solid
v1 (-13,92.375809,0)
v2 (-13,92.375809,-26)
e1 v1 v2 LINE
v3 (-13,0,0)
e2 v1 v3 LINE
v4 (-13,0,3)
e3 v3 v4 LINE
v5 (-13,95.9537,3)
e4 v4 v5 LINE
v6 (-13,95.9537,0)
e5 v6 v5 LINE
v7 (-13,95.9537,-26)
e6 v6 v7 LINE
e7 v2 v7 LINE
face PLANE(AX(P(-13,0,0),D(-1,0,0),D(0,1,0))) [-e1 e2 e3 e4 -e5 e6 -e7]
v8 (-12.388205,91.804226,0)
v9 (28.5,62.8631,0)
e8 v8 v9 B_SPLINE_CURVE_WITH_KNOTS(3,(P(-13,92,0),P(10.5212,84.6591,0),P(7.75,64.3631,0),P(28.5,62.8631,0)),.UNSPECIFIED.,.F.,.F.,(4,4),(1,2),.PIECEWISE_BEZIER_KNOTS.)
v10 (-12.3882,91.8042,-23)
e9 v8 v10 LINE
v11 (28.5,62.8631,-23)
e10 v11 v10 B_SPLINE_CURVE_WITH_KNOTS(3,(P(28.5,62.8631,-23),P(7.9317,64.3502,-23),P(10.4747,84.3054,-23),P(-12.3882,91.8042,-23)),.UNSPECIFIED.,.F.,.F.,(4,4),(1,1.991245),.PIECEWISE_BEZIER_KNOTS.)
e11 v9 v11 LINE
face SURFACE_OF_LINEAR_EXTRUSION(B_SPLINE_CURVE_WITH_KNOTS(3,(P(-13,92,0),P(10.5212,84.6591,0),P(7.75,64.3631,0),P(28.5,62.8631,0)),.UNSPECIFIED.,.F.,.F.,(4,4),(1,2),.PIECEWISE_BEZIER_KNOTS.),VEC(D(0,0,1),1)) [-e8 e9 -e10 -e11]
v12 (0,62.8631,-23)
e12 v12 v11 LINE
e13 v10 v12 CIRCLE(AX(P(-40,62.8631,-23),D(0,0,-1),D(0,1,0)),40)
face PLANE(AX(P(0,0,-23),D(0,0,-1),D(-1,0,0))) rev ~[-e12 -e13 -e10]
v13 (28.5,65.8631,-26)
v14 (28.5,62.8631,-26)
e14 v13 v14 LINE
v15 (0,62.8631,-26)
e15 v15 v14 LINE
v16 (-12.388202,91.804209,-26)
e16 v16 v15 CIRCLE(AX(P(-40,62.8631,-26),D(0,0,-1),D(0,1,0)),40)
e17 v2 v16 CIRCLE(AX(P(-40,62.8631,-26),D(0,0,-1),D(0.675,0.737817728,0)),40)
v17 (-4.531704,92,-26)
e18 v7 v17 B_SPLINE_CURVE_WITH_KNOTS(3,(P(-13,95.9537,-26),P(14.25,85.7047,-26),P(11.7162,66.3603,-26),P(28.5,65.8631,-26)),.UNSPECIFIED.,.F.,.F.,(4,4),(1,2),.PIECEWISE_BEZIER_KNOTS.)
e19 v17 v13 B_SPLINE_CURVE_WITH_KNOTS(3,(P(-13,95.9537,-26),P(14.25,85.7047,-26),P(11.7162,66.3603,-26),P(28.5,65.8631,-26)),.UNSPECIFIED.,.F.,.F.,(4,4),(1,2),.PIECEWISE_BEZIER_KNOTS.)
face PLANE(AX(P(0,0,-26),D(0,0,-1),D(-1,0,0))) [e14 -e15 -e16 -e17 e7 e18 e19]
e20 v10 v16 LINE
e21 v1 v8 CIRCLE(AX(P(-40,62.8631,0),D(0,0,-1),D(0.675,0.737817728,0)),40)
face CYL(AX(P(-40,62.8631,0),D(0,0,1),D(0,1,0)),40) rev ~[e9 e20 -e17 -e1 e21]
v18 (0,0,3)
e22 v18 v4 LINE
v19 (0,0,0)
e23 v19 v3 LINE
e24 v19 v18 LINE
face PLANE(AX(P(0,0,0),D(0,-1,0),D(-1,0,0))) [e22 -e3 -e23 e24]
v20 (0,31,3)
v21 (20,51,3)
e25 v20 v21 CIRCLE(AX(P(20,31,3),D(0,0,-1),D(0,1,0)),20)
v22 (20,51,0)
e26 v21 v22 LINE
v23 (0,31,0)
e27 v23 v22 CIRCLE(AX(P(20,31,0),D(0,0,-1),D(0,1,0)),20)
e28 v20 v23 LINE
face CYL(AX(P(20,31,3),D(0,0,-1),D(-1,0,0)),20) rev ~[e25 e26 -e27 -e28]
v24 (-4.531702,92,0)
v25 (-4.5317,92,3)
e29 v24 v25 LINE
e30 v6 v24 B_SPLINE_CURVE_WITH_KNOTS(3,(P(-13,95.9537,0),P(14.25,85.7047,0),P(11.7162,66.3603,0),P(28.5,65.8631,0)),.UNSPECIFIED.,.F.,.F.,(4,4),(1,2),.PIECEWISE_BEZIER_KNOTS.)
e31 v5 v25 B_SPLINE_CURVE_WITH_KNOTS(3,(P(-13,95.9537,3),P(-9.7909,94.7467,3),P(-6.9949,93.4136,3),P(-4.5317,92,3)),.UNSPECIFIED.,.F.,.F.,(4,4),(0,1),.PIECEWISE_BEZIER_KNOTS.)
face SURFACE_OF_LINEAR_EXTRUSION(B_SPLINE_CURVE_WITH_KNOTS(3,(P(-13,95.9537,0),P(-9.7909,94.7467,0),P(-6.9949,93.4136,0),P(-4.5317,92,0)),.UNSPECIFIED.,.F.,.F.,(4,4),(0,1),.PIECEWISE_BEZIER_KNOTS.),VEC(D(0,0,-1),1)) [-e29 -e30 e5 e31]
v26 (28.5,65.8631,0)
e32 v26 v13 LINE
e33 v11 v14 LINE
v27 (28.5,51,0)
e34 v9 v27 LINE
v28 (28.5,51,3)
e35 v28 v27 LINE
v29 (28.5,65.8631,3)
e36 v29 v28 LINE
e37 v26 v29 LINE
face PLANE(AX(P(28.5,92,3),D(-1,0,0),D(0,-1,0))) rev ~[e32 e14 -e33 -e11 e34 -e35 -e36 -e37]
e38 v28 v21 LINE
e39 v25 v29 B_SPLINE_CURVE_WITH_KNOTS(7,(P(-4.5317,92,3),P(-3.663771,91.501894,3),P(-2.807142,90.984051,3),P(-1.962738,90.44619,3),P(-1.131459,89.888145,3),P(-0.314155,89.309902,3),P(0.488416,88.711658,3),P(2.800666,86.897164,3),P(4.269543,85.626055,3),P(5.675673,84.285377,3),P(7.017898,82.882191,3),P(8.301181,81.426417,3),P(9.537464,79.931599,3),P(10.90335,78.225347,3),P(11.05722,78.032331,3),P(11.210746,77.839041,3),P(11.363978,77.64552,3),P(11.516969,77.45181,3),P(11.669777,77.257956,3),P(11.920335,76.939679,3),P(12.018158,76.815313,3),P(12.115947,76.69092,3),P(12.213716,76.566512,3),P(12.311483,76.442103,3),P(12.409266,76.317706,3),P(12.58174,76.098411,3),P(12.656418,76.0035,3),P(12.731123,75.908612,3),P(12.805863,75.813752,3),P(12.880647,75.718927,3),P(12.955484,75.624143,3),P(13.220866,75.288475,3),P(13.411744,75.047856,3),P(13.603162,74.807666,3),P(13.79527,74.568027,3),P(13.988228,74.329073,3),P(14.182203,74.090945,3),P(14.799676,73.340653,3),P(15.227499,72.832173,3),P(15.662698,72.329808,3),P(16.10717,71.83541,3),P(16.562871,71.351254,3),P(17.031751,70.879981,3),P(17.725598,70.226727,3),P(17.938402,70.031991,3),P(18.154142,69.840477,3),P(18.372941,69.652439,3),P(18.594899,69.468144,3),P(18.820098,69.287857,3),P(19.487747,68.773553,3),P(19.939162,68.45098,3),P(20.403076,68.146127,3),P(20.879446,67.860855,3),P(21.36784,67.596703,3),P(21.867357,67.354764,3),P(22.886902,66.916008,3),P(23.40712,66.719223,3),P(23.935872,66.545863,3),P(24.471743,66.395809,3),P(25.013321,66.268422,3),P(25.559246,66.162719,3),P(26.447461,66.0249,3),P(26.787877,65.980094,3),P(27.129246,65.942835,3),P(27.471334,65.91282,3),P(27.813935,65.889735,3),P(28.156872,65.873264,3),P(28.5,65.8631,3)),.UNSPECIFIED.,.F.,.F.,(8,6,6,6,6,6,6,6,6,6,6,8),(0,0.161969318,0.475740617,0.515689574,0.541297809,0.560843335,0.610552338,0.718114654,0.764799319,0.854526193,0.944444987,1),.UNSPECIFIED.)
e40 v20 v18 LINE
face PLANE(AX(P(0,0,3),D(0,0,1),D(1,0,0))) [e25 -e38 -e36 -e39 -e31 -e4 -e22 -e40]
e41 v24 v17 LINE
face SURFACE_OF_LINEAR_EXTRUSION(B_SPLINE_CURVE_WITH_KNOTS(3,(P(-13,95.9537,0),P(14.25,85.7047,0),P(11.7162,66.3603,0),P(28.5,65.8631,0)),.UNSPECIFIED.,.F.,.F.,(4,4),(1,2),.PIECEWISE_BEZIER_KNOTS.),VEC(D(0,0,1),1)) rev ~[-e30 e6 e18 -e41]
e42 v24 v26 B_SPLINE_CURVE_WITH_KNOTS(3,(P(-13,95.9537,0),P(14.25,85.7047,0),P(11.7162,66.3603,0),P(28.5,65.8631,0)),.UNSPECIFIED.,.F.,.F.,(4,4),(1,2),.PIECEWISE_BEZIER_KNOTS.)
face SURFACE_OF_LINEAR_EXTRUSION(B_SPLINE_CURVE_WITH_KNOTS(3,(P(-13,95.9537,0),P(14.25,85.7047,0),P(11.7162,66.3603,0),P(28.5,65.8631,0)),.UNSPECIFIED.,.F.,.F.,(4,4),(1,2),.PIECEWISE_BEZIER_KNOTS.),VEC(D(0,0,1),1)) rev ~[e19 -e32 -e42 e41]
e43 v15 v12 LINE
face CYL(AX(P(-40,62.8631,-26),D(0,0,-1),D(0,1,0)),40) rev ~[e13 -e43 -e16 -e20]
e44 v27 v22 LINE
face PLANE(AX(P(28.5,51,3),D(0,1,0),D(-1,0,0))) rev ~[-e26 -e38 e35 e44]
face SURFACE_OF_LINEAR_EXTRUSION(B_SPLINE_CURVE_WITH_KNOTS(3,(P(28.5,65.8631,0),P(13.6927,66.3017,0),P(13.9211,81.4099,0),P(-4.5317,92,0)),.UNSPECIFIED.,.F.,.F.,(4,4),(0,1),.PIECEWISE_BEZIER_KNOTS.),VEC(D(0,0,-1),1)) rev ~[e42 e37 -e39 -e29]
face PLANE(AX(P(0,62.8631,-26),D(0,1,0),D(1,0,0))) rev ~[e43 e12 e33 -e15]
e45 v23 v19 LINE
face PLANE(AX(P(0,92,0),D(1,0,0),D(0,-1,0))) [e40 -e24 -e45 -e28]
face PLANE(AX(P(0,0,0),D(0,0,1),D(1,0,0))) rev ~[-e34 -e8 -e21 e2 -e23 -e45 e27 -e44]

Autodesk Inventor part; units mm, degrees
ref_plane "YZ Plane" through (0, 0, 0) normal (1, 0, 0) x (0, 1, 0)
ref_plane "XZ Plane" through (0, 0, 0) normal (0, 1, 0) x (-1, 0, 0)
ref_plane "XY Plane" through (0, 0, 0) normal (0, 0, 1) x (1, 0, 0)
sketch "Sketch1" plane through (0, 0, 0) normal (0, 0, 1) x (1, 0, 0)
  line L0 (0, 0) -> (-13, 0)
  line L1 (-13, 0) -> (-13, 92)
  line L2 (-13, 92) -> (0, 92)
  line L3 (0, 92) -> (0, 0)
  dimension "d0" = 13
  dimension "d1" = 92
extrude "Extrusion1" add sketch "Sketch1" along normal blind 3
sketch "Sketch3" plane through (0, 0, 3) normal (0, 0, 1) x (1, 0, 0)
  line L0 (0, 92) -> (-13, 92) projected
  line L1 (0, 92) -> (28.5, 92)
  line L2 (28.5, 92) -> (28.5, 51)
  line L3 (28.5, 51) -> (0, 51)
  line L4 (0, 51) -> (0, 92)
  point P0 (0, 0)
  dimension "d6" = 28.5
  dimension "d7" = 41
extrude "Extrusion3" add sketch "Sketch3" against normal up to surface (3 mm away)
sketch "Sketch4" plane through (0, 0, 0) normal (0, 0, -1) x (-1, 0, 0)
  arc A0 (40, 102.8631) -> (0, 62.8631) centre (40, 62.8631) ccw
  arc A1 (-28.5, 65.8631) -> (-42.9914, -4.1369) centre (-28.5, 29.3631) ccw
  line L0 (13, 92) -> (0, 92)
  line L1 (0, 92) -> (-28.5, 92)
  line L2 (-28.5, 92) -> (-28.5, 51)
  line L3 (-28.5, 92) -> (13, 92) projected
  line L4 (-28.5, 65.8631) -> (-28.5, 62.8631)
  line L5 (-28.5, 51) -> (-28.5, 92) projected
  line L6 (13, 92) -> (13, 89)
  line L7 (13, 92) -> (13, 0) projected
  arc A2 (40, 105.4873) -> (13, 95.9537) centre (40, 62.4873) ccw
  line L8 (13, 92) -> (13, 95.9537)
  line L9 (13, 92) -> (-10.5212, 84.6591) construction
  line L10 (-10.5212, 84.6591) -> (-7.75, 64.3631) construction
  line L11 (-7.75, 64.3631) -> (-28.5, 62.8631) construction
  spline S0 degree 3 poles (13, 92) (-10.5212, 84.6591) (-7.75, 64.3631) (-28.5, 62.8631) knots 1 1 1 1 2 2 2 2
  line L12 (13, 95.9537) -> (-14.25, 85.7047) construction
  line L13 (-14.25, 85.7047) -> (-11.7162, 66.3603) construction
  line L14 (-11.7162, 66.3603) -> (-28.5, 65.8631) construction
  spline S1 degree 3 poles (13, 95.9537) (-14.25, 85.7047) (-11.7162, 66.3603) (-28.5, 65.8631) knots 1 1 1 1 2 2 2 2
  point P0 (0, 0)
  point P1 (12.3882, 91.8042)
  point P2 (13, 92.3758)
  dimension "d10" = 3
  dimension "d11" = 3
extrude "Extrusion4" add sketch "Sketch4" along normal blind 26 contours A0 L0 S1 L8 | A0 S0 L2 S1 L0
sketch "Sketch5" plane through (0, 0, 0) normal (0, 0, -1) x (-1, 0, 0)
  spline S0 degree 3 poles (-28.5, 65.8631) (-13.6927, 66.3017) (-13.9211, 81.4099) (4.5317, 92) knots 0 0 0 0 1 1 1 1 projected
  line L0 (-28.5, 92) -> (4.5317, 92) projected
  line L1 (-28.5, 92) -> (-28.5, 65.8631) projected
  point P0 (0, 0)
extrude "Extrusion5" cut sketch "Sketch5" against normal blind 40
sketch "Sketch6" plane through (0, 0, 0) normal (0, 0, 1) x (1, 0, 0)
  line L0 (-4.5317, 92) -> (-12.5949, 92) projected
  spline S0 degree 3 poles (-13, 95.9537) (-9.7909, 94.7467) (-6.9949, 93.4136) (-4.5317, 92) knots 0 0 0 0 1 1 1 1 projected
  line L1 (-13, 92.3758) -> (-13, 95.9537) projected
  arc A0 (-12.5949, 92) -> (-13, 92.3758) centre (-40, 62.8631) ccw projected
  arc A1 (-12.5949, 92) -> (-13, 92.3758) centre (-40, 62.8631) ccw projected
  line L2 (-13, 92.3758) -> (-13, 92)
  line L3 (-13, 92) -> (-12.5949, 92)
  point P0 (0, 0)
extrude "Extrusion6" add sketch "Sketch6" along normal up to surface (3 mm away)
sketch "Sketch7" plane through (0, 0, -26) normal (0, 0, -1) x (-1, 0, 0)
  spline S0 degree 3 poles (-28.5, 62.8631) (-7.9317, 64.3502) (-10.4747, 84.3054) (12.3882, 91.8042) knots 1 1 1 1 1.991245 1.991245 1.991245 1.991245
  arc A0 (40, 102.8631) -> (0, 62.8631) centre (40, 62.8631) ccw
  line L0 (0, 62.8631) -> (-28.5, 62.8631)
  line L1 (-28.5, 62.8631) -> (-28.5, 65.8631)
  line L2 (-28.5, 51) -> (-28.5, 65.8631) projected
  point P0 (0, 0)
extrude "Extrusion7" add sketch "Sketch7" against normal blind 3
fillet "Fillet1" radius 20 1 edges at (0, 51, 1.5)
properties part number "obudowa przekładni 6"
